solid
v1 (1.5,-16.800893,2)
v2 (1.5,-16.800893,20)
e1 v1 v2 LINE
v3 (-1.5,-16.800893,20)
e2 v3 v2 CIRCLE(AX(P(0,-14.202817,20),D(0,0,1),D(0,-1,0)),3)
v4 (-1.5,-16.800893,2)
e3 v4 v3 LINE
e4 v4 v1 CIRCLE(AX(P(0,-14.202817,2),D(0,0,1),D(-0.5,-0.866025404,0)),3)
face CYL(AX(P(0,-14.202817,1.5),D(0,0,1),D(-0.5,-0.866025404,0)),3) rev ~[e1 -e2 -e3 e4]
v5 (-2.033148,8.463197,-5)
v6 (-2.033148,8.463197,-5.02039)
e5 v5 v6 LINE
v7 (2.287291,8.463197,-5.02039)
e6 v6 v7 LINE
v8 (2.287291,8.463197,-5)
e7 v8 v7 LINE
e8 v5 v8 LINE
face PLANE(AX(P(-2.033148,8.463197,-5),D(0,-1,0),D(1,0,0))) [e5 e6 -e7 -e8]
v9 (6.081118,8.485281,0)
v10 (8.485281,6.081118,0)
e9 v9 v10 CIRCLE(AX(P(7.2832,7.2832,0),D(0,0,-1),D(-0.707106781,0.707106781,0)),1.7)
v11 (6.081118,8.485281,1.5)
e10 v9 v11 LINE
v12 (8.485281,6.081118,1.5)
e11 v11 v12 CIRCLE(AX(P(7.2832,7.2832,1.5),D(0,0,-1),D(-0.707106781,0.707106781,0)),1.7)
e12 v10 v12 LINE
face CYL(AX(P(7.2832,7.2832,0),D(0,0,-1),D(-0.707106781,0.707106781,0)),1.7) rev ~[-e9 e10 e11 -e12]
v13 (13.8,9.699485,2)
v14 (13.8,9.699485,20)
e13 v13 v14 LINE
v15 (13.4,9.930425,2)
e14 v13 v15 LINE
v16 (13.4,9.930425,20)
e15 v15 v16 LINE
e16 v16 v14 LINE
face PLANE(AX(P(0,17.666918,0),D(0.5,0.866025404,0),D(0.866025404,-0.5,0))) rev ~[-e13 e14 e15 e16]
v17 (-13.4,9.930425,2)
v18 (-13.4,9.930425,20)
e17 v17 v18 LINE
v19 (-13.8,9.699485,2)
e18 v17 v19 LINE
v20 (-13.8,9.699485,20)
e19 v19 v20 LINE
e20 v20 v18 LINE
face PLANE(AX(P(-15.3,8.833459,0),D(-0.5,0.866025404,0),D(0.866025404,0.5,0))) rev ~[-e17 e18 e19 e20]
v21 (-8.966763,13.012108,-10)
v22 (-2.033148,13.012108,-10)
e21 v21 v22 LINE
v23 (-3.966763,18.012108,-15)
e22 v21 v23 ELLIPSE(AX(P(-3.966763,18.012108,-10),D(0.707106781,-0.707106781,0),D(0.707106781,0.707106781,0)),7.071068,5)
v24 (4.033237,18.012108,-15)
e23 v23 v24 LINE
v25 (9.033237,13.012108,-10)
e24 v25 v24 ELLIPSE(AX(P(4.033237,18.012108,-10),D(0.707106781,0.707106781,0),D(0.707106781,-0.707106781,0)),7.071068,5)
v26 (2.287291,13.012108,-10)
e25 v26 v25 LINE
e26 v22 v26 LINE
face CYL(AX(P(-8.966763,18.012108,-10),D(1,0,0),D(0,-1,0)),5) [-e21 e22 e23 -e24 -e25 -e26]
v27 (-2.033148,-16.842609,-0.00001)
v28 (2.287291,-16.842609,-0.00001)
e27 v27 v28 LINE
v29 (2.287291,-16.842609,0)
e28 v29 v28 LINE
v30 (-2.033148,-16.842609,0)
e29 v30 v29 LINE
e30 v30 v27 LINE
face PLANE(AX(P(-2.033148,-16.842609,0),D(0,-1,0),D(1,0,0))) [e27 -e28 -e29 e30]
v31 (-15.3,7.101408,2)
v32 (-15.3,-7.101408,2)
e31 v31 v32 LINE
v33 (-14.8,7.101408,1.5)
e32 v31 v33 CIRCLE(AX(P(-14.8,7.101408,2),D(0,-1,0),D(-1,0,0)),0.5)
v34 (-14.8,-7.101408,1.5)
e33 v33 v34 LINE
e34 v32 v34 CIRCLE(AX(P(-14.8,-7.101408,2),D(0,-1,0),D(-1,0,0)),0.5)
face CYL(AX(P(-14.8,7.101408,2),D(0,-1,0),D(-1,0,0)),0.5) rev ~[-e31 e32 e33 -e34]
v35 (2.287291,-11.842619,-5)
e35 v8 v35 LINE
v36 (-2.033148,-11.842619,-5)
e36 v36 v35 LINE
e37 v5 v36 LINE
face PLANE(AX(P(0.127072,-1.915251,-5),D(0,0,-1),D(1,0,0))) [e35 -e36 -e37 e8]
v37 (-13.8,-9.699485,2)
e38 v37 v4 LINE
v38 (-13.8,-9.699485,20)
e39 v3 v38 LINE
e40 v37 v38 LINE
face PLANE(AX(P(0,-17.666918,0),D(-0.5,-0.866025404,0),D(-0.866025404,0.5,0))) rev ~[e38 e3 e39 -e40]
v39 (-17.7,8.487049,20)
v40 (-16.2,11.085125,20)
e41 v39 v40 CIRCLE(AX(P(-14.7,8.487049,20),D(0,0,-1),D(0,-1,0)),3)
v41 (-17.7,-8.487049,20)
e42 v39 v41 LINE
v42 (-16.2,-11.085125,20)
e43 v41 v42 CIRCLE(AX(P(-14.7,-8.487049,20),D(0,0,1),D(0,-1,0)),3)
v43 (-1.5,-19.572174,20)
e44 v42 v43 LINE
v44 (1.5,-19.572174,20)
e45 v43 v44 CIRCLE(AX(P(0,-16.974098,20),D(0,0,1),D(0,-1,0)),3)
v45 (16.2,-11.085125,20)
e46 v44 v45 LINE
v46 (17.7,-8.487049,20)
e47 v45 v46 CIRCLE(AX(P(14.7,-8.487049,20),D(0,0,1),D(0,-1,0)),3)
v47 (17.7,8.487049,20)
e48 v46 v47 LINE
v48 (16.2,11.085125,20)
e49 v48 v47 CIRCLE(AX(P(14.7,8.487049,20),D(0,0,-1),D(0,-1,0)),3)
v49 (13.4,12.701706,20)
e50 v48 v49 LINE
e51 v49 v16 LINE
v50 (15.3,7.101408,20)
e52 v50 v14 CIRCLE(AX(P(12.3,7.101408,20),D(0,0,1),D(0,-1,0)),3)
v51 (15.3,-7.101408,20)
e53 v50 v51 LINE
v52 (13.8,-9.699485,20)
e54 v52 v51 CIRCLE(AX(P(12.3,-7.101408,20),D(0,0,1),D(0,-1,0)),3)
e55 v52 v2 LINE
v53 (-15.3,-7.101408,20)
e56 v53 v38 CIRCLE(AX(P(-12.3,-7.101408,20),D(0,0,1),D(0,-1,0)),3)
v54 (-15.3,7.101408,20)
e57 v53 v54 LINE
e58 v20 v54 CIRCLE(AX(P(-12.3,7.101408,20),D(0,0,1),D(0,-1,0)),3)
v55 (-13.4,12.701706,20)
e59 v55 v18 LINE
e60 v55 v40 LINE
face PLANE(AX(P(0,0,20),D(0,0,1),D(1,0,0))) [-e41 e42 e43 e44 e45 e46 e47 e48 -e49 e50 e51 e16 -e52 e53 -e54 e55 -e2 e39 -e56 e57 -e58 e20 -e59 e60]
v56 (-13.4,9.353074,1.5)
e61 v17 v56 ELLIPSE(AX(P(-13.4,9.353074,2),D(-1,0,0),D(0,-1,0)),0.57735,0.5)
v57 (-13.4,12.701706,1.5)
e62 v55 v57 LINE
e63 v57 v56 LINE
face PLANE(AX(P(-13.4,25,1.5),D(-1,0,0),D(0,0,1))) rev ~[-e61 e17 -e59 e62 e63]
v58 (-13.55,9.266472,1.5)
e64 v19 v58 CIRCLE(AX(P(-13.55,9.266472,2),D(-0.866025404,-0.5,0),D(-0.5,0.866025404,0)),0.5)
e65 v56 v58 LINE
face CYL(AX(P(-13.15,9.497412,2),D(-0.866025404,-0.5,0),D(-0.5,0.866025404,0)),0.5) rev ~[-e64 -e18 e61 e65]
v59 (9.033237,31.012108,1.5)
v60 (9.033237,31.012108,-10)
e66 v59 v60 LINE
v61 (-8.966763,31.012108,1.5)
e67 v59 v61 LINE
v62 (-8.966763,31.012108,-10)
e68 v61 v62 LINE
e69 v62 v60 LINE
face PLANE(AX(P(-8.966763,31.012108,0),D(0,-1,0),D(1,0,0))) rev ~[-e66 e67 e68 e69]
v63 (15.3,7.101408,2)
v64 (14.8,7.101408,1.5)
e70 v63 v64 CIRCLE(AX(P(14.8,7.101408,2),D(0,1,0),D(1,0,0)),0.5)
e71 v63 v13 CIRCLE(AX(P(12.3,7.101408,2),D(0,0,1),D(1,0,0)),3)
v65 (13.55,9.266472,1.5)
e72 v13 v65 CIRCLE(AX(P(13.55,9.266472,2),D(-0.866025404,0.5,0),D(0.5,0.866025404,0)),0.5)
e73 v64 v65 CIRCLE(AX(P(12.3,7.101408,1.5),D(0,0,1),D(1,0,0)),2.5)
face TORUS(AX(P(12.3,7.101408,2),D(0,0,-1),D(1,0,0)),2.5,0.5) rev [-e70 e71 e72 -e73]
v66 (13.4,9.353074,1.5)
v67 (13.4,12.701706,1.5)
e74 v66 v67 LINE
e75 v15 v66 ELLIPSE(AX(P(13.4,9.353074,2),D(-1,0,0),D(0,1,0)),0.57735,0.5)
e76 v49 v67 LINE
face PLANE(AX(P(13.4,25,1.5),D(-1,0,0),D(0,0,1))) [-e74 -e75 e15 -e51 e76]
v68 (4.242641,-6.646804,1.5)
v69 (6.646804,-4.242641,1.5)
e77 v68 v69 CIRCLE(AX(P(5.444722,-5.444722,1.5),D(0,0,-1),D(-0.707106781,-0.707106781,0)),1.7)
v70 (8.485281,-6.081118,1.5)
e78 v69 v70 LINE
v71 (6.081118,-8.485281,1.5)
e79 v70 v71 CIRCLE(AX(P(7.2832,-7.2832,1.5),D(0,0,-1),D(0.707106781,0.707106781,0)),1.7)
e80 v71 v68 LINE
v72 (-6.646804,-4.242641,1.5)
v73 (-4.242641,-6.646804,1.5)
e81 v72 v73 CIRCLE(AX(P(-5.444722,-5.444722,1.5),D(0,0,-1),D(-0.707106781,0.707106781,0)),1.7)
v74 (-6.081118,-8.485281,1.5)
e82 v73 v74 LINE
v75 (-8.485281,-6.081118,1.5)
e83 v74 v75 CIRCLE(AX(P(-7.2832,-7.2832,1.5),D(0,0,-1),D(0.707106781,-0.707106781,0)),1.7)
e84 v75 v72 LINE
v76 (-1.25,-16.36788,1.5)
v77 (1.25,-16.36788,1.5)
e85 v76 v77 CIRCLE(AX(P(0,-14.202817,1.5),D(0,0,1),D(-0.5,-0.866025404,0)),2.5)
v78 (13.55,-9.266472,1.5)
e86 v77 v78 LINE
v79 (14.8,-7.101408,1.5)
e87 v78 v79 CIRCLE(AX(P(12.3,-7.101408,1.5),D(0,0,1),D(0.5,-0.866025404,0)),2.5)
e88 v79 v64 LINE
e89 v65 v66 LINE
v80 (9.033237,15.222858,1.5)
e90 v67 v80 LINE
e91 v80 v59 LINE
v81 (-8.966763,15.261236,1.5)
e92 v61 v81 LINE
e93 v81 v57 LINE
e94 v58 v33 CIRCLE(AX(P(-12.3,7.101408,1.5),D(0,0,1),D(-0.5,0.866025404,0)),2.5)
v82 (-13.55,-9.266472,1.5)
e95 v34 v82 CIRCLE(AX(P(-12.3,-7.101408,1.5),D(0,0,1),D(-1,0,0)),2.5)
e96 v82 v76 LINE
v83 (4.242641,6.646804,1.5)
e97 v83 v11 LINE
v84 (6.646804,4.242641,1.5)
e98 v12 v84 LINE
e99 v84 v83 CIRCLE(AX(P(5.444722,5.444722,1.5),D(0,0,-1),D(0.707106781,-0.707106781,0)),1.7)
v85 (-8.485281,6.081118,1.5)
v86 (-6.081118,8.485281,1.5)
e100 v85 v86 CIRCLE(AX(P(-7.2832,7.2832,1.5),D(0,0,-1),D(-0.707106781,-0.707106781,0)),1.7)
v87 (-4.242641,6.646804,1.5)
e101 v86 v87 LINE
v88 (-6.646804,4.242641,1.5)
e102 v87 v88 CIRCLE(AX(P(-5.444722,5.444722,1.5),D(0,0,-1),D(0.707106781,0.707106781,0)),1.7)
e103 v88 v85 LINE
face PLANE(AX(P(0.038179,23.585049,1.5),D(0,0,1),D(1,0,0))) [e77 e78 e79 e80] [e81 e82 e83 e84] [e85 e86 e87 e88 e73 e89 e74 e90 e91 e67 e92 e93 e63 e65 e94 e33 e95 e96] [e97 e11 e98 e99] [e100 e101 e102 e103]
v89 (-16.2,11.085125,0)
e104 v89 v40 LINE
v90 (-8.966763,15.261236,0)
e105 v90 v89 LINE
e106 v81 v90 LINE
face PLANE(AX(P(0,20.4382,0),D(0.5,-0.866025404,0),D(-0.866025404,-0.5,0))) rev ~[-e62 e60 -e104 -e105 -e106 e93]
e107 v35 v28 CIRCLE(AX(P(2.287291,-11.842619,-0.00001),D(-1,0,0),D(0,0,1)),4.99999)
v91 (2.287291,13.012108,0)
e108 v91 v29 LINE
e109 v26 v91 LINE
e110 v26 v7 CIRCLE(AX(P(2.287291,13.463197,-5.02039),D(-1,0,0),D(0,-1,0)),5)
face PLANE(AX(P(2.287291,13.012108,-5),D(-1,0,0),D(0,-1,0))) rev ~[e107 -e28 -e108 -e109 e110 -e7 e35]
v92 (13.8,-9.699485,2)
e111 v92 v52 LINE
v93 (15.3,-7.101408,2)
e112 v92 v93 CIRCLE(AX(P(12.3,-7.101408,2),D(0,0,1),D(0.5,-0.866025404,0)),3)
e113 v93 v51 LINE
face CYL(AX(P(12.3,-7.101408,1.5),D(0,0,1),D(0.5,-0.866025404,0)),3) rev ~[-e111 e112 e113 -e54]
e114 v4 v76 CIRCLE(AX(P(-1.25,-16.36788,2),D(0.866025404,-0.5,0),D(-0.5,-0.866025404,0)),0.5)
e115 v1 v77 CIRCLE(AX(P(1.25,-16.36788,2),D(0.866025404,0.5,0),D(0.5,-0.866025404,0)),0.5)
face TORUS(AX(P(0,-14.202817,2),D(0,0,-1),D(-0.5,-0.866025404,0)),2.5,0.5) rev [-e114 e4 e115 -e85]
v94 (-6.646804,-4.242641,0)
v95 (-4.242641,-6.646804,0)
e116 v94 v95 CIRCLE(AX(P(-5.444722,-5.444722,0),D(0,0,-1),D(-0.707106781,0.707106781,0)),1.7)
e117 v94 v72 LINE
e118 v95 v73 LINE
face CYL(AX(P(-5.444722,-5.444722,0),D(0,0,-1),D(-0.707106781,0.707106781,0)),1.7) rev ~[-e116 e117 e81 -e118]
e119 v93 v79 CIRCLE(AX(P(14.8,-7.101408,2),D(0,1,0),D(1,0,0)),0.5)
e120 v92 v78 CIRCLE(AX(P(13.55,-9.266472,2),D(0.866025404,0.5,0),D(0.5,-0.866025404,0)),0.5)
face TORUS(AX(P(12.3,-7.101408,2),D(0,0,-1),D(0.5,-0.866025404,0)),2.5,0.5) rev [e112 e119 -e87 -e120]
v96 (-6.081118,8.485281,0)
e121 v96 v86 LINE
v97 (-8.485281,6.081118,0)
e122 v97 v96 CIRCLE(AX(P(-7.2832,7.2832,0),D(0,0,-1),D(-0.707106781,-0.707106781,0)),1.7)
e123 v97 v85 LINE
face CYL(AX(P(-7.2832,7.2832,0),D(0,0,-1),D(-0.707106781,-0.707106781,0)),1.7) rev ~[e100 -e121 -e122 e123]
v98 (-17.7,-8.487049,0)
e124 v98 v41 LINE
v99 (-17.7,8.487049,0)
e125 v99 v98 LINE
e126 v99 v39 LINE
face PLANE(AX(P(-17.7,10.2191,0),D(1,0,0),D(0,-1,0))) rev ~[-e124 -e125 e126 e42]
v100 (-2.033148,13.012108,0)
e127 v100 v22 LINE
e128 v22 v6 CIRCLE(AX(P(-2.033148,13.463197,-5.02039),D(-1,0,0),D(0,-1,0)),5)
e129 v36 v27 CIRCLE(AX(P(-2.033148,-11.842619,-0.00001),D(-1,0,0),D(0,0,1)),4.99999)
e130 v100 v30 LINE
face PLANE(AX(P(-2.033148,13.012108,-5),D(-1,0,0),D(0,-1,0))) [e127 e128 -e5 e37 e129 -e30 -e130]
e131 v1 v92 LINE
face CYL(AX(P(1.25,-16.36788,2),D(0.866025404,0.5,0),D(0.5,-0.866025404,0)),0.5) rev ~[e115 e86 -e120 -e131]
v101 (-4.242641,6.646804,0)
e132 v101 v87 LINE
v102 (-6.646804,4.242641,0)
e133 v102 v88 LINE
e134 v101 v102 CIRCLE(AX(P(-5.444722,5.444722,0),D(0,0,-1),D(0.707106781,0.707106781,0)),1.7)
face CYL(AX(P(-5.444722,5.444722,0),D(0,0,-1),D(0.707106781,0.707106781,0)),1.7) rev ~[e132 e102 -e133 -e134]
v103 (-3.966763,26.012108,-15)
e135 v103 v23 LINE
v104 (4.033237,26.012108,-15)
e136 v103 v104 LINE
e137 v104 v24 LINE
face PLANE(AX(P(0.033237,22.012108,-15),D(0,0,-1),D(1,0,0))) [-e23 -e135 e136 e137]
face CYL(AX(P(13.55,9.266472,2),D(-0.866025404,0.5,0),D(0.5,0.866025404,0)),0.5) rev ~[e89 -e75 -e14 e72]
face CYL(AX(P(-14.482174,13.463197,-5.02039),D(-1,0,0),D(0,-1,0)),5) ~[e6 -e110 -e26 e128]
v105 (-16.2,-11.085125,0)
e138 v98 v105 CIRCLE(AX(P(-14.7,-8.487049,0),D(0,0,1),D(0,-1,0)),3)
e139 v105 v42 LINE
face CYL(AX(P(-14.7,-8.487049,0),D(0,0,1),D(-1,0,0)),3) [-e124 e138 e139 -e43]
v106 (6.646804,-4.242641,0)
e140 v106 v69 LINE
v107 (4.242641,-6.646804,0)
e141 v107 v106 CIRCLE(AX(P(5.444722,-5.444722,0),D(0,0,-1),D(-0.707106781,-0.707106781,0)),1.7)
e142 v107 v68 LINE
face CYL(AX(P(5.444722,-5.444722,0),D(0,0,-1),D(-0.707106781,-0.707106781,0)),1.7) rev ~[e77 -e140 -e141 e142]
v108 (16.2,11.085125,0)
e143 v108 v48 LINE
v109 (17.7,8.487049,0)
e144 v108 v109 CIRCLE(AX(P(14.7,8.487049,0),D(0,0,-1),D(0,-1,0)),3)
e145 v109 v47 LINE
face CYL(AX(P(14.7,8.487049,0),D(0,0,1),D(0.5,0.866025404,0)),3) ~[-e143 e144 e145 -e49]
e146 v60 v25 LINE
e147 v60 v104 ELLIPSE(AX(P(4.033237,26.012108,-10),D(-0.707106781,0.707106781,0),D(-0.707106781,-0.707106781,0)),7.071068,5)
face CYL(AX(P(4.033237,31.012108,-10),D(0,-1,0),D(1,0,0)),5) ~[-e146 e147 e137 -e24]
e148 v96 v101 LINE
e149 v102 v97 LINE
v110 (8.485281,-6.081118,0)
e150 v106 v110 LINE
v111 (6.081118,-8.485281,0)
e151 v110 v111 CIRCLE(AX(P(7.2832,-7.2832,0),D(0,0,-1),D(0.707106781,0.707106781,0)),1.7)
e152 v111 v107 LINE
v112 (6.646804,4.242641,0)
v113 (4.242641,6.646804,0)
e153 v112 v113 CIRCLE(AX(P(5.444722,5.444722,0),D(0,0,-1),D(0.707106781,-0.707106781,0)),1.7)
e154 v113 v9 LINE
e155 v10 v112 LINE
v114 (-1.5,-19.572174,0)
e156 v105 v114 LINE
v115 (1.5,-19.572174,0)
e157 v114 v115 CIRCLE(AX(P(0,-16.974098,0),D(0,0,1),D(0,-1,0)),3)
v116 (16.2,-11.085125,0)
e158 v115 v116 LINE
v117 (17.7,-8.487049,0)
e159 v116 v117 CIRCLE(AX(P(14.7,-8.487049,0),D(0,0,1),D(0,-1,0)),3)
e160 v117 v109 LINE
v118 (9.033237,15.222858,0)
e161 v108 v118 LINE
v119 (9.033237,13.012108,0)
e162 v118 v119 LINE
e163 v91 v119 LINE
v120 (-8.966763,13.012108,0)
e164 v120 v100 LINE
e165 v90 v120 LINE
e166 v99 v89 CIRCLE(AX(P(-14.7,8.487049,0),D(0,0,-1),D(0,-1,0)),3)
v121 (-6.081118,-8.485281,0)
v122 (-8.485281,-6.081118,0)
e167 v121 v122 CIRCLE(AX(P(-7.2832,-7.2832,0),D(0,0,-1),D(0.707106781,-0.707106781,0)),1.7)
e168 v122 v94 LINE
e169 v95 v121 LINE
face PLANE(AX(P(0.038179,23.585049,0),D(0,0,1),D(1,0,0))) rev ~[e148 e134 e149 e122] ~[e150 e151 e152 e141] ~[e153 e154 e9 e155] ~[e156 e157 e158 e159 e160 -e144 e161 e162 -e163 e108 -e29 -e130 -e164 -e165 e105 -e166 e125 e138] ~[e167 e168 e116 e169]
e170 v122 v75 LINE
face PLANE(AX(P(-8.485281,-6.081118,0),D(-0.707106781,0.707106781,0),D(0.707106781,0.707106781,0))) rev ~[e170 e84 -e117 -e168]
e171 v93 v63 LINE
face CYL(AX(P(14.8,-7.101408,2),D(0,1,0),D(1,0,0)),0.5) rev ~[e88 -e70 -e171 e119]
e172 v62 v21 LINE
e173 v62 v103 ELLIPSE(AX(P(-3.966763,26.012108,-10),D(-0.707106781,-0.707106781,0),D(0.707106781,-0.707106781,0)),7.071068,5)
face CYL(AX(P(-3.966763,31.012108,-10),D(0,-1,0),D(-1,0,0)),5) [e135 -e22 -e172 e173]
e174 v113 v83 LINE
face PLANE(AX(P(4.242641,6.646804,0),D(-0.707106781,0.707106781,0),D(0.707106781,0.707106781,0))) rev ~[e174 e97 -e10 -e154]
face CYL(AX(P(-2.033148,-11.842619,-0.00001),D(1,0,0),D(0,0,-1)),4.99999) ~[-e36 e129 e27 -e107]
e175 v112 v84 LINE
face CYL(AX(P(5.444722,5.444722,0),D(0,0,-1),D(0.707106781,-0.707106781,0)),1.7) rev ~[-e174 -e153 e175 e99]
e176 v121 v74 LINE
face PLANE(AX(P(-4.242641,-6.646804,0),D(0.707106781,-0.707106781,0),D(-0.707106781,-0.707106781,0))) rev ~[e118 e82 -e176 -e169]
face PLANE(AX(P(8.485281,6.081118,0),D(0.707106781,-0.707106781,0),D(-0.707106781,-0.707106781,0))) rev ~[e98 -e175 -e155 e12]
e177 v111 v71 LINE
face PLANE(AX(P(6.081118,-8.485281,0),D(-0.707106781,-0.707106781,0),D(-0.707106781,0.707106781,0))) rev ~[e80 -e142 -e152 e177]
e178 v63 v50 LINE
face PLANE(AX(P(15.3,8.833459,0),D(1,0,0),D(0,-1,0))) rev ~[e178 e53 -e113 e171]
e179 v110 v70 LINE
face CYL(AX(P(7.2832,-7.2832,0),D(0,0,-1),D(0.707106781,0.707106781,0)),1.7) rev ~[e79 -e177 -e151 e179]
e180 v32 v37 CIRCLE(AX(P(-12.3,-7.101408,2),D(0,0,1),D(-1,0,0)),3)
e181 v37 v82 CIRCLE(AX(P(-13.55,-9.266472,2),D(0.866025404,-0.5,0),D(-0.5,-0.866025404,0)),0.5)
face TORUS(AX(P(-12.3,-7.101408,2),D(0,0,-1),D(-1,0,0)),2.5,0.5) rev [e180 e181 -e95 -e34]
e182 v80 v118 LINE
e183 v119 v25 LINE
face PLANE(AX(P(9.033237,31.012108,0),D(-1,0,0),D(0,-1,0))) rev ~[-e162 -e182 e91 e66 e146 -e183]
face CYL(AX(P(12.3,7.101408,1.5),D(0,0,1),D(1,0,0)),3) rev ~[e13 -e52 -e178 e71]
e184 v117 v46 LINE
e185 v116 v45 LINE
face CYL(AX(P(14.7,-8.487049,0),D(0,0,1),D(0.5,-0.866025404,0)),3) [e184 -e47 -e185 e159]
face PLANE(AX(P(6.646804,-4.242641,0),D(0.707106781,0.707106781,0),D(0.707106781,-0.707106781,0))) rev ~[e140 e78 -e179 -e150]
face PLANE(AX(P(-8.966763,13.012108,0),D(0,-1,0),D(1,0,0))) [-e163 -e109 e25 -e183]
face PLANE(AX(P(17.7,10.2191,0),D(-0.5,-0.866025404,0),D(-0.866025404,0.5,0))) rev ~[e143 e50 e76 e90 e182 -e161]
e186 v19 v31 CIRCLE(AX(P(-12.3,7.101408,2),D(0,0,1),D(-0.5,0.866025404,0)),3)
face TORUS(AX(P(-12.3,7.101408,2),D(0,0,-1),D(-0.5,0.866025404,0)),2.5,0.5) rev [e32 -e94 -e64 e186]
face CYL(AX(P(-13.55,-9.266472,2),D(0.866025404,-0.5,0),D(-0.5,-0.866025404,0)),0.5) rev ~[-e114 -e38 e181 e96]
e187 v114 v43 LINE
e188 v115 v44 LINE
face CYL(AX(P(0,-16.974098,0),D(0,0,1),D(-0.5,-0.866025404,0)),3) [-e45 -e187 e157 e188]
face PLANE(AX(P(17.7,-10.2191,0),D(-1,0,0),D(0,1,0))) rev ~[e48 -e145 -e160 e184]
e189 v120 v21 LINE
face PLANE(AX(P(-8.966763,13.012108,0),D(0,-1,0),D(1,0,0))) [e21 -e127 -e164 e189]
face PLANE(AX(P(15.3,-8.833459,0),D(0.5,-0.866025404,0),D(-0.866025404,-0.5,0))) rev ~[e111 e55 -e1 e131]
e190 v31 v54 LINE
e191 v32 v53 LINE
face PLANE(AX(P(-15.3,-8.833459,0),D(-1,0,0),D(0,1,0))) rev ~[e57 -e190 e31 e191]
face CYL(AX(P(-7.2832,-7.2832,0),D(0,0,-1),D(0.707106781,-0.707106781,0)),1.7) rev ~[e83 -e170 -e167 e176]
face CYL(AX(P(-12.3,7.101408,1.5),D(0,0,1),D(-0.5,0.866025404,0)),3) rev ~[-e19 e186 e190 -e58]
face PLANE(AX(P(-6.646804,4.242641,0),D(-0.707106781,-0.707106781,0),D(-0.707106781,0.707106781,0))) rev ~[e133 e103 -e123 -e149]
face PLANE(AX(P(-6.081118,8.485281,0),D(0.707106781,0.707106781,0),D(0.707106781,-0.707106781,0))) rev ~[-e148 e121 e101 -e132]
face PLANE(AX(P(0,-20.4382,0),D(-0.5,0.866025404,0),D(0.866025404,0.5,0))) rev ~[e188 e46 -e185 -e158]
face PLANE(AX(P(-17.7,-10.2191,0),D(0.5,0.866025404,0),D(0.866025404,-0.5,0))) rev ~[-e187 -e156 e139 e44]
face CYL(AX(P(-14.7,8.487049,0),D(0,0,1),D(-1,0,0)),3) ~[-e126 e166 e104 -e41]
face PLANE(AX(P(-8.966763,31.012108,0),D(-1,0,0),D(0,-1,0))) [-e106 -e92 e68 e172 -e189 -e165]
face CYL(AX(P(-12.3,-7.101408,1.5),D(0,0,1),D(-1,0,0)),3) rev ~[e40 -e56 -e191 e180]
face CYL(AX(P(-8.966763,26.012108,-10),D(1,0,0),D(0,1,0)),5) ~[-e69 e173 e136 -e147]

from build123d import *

# Parameters (mm, degrees)
F1_DEPTH     = 1.5
F2_DEPTH     = 20
F4_W         = 26.8
F4_H         = 20.4379309565
F5_DEPTH     = 26
F6_R         = 3
F7_R         = 0.5
F9_DEPTH     = 1.5
F10_W        = 18
F10_H        = 18
F11_DEPTH    = 15
F12_R        = 5
F13_W        = 4.3204394169
F13_H        = 29.8547168866
F14_DEPTH    = 5
F15_R        = 4.99999
F16_W        = 4.3204394169
F16_H        = 4.5489102274
F17_DEPTH    = 5
F18_T1_DEPTH = 29.218490554


# Not quite as in the source:
# - a fillet or chamfer that OpenCascade refuses, or shapes differently, is made with other operations: its cross-section is extruded or revolved along the edge and cut away or added
# - a fillet or chamfer is up to 0.001 mm smaller than in the source, because OpenCascade refuses the exact size


with BuildPart() as f1:
    # F0 (on Top) → F1 (new body)
    with BuildSketch(Plane.XY):
        Polygon((0, -17.6669182372), (15.3, -8.8334591186), (15.3, 8.8334591186), (0, 17.6669182372), (-15.3, 8.8334591186), (-15.3, -8.8334591186), align=None)
        with BuildLine():
            ThreePointArc((-6.0811183182, -8.4852813742), (-8.4852813742, -8.4852813742), (-8.4852813742, -6.0811183182))
            Line((-8.4852813742, -6.0811183182), (-6.6468037432, -4.2426406871))
            ThreePointArc((-6.6468037432, -4.2426406871), (-4.2426406871, -4.2426406871), (-4.2426406871, -6.6468037432))
            Line((-4.2426406871, -6.6468037432), (-6.0811183182, -8.4852813742))
        make_face(mode=Mode.SUBTRACT)
        with BuildLine():
            ThreePointArc((8.4852813742, -6.0811183182), (8.4852813742, -8.4852813742), (6.0811183182, -8.4852813742))
            Line((6.0811183182, -8.4852813742), (4.2426406871, -6.6468037432))
            ThreePointArc((4.2426406871, -6.6468037432), (4.2426406871, -4.2426406871), (6.6468037432, -4.2426406871))
            Line((6.6468037432, -4.2426406871), (8.4852813742, -6.0811183182))
        make_face(mode=Mode.SUBTRACT)
        with BuildLine():
            ThreePointArc((-8.4852813742, 6.0811183182), (-8.4852813742, 8.4852813742), (-6.0811183182, 8.4852813742))
            Line((-6.0811183182, 8.4852813742), (-4.2426406871, 6.6468037432))
            ThreePointArc((-4.2426406871, 6.6468037432), (-4.2426406871, 4.2426406871), (-6.6468037432, 4.2426406871))
            Line((-6.6468037432, 4.2426406871), (-8.4852813742, 6.0811183182))
        make_face(mode=Mode.SUBTRACT)
        with BuildLine():
            Line((4.2426406871, 6.6468037432), (6.0811183182, 8.4852813742))
            ThreePointArc((6.0811183182, 8.4852813742), (8.4852813742, 8.4852813742), (8.4852813742, 6.0811183182))
            Line((8.4852813742, 6.0811183182), (6.6468037432, 4.2426406871))
            ThreePointArc((6.6468037432, 4.2426406871), (4.2426406871, 4.2426406871), (4.2426406871, 6.6468037432))
        make_face(mode=Mode.SUBTRACT)
    extrude(amount=F1_DEPTH)

    # F0 (on Top) → F2 (join)
    with BuildSketch(Plane.XY):
        Polygon((-17.7, 10.2190997647), (-17.7, -10.2190997647), (0, -20.4381995293), (17.7, -10.2190997647), (17.7, 10.2190997647), (0, 20.4381995293), align=None)
        Polygon((15.3, 8.8334591186), (15.3, -8.8334591186), (0, -17.6669182372), (-15.3, -8.8334591186), (-15.3, 8.8334591186), (0, 17.6669182372), align=None, mode=Mode.SUBTRACT)
    extrude(amount=F2_DEPTH)

    # F4 (on offset) → F5 (cut)
    with BuildSketch(Plane.XZ.offset(-25)):
        with Locations((0, 11.7189654782)):
            Rectangle(F4_W, F4_H)
    extrude(amount=F5_DEPTH, mode=Mode.SUBTRACT)

    # F6
    f6_edges = [f1.edges().sort_by_distance(p)[0] for p in [
        (17.7, 10.2191, 10),
        (-17.7, 10.2191, 10),
        (-17.7, -10.2191, 10),
        (0, -20.4382, 10),
        (17.7, -10.2191, 10),
        (15.3, 8.833459, 10.75),
        (15.3, -8.833459, 10.75),
        (0, -17.666918, 10.75),
        (-15.3, -8.833459, 10.75),
        (-15.3, 8.833459, 10.75),
    ]]
    fillet(f6_edges, radius=F6_R)

    # F7
    f7_edges = [f1.edges().sort_by_distance(p)[0] for p in [
        (-13.6, 9.814955, 1.5),
        (0, 20.4382, 0.75),
        (-7.65, -13.250189, 1.5),
        (-14.898076, -8.601408, 1.5),
        (0, -17.202817, 1.5),
        (-15.3, 0, 1.5),
        (7.65, -13.250189, 1.5),
        (-14.898076, 8.601408, 1.5),
        (14.898076, -8.601408, 1.5),
        (15.3, 0, 1.5),
        (14.898076, 8.601408, 1.5),
        (13.6, 9.814955, 1.5),
    ]]
    fillet(f7_edges, radius=F7_R)

    # F8 (on face) → F9 (join)
    with BuildSketch(Plane.XY.offset(1.5)):
        with BuildLine():
            Line((-8.9667634256, 31.0121076152), (-8.9667634256, 15.2612362518))
            Line((-8.9667634256, 15.2612362518), (-0.25, 20.293861962))
            ThreePointArc((-0.25, 20.293861962), (0, 20.3608492601), (0.25, 20.293861962))
            Line((0.25, 20.293861962), (9.0332365744, 15.2228579614))
            Line((9.0332365744, 15.2228579614), (9.0332365744, 31.0121076152))
            Line((9.0332365744, 31.0121076152), (-8.9667634256, 31.0121076152))
        make_face()
    extrude(amount=-F9_DEPTH)

    # F10 (on face) → F11 (join)
    with BuildSketch(Plane(origin=(0, 0, 0), x_dir=(1, 0, 0), z_dir=(0, 0, -1))):
        with Locations((0.0332365744, -22.0121076152)):
            Rectangle(F10_W, F10_H)
    extrude(amount=F11_DEPTH)

    # F12
    f12_edges = [f1.edges().sort_by_distance(p)[0] for p in [
        (9.033237, 22.012108, -15),
        (0.033237, 13.012108, -15),
        (-8.966763, 22.012108, -15),
        (0.033237, 31.012108, -15),
    ]]
    fillet(f12_edges, radius=F12_R)

    # F13 (on face) → F14 (join)
    with BuildSketch(Plane(origin=(0, 0, 0), x_dir=(1, 0, 0), z_dir=(0, 0, -1))):
        with Locations((0.1270717476, 1.9152508281)):
            Rectangle(F13_W, F13_H)
    extrude(amount=F14_DEPTH)

    # F15 (radius 5 in the source; OpenCascade refuses exactly that, so slightly less here)
    f15_edges = [f1.edges().sort_by_distance(p)[0] for p in [
        (0.127072, -16.842609, -5),
    ]]
    fillet(f15_edges, radius=F15_R)

    # F16 (on face) → F17 (join)
    with BuildSketch(Plane(origin=(0, 0, -5), x_dir=(1, 0, 0), z_dir=(0, 0, -1))):
        with Locations((0.1270717476, -10.7376525015)):
            Rectangle(F16_W, F16_H)
    extrude(amount=F17_DEPTH)

    # F18: fillet of radius 5 on 1 edges, made by hand

    # F18_s2 → F18_t1 (cut)
    with BuildSketch(Plane.YZ.offset(-14.4821735295)):
        with BuildLine():
            ThreePointArc((8.4631973878, -5.0203897726), (9.7716225976, -8.3926702426), (13.0121076152, -10))
            Line((13.0121076152, -10), (13.0030858197, -10.0995922045))
            ThreePointArc((13.0030858197, -10.0995922045), (10.7376525015, -10.1), (8.4631973878, -10.1))
            Line((8.4631973878, -10.1), (8.3631973878, -10))
            Line((8.3631973878, -10), (8.3631973878, -5.0203897726))
            Line((8.3631973878, -5.0203897726), (8.4631973878, -5.0203897726))
        make_face()
    extrude(amount=F18_T1_DEPTH, mode=Mode.SUBTRACT)


solid = f1.part
